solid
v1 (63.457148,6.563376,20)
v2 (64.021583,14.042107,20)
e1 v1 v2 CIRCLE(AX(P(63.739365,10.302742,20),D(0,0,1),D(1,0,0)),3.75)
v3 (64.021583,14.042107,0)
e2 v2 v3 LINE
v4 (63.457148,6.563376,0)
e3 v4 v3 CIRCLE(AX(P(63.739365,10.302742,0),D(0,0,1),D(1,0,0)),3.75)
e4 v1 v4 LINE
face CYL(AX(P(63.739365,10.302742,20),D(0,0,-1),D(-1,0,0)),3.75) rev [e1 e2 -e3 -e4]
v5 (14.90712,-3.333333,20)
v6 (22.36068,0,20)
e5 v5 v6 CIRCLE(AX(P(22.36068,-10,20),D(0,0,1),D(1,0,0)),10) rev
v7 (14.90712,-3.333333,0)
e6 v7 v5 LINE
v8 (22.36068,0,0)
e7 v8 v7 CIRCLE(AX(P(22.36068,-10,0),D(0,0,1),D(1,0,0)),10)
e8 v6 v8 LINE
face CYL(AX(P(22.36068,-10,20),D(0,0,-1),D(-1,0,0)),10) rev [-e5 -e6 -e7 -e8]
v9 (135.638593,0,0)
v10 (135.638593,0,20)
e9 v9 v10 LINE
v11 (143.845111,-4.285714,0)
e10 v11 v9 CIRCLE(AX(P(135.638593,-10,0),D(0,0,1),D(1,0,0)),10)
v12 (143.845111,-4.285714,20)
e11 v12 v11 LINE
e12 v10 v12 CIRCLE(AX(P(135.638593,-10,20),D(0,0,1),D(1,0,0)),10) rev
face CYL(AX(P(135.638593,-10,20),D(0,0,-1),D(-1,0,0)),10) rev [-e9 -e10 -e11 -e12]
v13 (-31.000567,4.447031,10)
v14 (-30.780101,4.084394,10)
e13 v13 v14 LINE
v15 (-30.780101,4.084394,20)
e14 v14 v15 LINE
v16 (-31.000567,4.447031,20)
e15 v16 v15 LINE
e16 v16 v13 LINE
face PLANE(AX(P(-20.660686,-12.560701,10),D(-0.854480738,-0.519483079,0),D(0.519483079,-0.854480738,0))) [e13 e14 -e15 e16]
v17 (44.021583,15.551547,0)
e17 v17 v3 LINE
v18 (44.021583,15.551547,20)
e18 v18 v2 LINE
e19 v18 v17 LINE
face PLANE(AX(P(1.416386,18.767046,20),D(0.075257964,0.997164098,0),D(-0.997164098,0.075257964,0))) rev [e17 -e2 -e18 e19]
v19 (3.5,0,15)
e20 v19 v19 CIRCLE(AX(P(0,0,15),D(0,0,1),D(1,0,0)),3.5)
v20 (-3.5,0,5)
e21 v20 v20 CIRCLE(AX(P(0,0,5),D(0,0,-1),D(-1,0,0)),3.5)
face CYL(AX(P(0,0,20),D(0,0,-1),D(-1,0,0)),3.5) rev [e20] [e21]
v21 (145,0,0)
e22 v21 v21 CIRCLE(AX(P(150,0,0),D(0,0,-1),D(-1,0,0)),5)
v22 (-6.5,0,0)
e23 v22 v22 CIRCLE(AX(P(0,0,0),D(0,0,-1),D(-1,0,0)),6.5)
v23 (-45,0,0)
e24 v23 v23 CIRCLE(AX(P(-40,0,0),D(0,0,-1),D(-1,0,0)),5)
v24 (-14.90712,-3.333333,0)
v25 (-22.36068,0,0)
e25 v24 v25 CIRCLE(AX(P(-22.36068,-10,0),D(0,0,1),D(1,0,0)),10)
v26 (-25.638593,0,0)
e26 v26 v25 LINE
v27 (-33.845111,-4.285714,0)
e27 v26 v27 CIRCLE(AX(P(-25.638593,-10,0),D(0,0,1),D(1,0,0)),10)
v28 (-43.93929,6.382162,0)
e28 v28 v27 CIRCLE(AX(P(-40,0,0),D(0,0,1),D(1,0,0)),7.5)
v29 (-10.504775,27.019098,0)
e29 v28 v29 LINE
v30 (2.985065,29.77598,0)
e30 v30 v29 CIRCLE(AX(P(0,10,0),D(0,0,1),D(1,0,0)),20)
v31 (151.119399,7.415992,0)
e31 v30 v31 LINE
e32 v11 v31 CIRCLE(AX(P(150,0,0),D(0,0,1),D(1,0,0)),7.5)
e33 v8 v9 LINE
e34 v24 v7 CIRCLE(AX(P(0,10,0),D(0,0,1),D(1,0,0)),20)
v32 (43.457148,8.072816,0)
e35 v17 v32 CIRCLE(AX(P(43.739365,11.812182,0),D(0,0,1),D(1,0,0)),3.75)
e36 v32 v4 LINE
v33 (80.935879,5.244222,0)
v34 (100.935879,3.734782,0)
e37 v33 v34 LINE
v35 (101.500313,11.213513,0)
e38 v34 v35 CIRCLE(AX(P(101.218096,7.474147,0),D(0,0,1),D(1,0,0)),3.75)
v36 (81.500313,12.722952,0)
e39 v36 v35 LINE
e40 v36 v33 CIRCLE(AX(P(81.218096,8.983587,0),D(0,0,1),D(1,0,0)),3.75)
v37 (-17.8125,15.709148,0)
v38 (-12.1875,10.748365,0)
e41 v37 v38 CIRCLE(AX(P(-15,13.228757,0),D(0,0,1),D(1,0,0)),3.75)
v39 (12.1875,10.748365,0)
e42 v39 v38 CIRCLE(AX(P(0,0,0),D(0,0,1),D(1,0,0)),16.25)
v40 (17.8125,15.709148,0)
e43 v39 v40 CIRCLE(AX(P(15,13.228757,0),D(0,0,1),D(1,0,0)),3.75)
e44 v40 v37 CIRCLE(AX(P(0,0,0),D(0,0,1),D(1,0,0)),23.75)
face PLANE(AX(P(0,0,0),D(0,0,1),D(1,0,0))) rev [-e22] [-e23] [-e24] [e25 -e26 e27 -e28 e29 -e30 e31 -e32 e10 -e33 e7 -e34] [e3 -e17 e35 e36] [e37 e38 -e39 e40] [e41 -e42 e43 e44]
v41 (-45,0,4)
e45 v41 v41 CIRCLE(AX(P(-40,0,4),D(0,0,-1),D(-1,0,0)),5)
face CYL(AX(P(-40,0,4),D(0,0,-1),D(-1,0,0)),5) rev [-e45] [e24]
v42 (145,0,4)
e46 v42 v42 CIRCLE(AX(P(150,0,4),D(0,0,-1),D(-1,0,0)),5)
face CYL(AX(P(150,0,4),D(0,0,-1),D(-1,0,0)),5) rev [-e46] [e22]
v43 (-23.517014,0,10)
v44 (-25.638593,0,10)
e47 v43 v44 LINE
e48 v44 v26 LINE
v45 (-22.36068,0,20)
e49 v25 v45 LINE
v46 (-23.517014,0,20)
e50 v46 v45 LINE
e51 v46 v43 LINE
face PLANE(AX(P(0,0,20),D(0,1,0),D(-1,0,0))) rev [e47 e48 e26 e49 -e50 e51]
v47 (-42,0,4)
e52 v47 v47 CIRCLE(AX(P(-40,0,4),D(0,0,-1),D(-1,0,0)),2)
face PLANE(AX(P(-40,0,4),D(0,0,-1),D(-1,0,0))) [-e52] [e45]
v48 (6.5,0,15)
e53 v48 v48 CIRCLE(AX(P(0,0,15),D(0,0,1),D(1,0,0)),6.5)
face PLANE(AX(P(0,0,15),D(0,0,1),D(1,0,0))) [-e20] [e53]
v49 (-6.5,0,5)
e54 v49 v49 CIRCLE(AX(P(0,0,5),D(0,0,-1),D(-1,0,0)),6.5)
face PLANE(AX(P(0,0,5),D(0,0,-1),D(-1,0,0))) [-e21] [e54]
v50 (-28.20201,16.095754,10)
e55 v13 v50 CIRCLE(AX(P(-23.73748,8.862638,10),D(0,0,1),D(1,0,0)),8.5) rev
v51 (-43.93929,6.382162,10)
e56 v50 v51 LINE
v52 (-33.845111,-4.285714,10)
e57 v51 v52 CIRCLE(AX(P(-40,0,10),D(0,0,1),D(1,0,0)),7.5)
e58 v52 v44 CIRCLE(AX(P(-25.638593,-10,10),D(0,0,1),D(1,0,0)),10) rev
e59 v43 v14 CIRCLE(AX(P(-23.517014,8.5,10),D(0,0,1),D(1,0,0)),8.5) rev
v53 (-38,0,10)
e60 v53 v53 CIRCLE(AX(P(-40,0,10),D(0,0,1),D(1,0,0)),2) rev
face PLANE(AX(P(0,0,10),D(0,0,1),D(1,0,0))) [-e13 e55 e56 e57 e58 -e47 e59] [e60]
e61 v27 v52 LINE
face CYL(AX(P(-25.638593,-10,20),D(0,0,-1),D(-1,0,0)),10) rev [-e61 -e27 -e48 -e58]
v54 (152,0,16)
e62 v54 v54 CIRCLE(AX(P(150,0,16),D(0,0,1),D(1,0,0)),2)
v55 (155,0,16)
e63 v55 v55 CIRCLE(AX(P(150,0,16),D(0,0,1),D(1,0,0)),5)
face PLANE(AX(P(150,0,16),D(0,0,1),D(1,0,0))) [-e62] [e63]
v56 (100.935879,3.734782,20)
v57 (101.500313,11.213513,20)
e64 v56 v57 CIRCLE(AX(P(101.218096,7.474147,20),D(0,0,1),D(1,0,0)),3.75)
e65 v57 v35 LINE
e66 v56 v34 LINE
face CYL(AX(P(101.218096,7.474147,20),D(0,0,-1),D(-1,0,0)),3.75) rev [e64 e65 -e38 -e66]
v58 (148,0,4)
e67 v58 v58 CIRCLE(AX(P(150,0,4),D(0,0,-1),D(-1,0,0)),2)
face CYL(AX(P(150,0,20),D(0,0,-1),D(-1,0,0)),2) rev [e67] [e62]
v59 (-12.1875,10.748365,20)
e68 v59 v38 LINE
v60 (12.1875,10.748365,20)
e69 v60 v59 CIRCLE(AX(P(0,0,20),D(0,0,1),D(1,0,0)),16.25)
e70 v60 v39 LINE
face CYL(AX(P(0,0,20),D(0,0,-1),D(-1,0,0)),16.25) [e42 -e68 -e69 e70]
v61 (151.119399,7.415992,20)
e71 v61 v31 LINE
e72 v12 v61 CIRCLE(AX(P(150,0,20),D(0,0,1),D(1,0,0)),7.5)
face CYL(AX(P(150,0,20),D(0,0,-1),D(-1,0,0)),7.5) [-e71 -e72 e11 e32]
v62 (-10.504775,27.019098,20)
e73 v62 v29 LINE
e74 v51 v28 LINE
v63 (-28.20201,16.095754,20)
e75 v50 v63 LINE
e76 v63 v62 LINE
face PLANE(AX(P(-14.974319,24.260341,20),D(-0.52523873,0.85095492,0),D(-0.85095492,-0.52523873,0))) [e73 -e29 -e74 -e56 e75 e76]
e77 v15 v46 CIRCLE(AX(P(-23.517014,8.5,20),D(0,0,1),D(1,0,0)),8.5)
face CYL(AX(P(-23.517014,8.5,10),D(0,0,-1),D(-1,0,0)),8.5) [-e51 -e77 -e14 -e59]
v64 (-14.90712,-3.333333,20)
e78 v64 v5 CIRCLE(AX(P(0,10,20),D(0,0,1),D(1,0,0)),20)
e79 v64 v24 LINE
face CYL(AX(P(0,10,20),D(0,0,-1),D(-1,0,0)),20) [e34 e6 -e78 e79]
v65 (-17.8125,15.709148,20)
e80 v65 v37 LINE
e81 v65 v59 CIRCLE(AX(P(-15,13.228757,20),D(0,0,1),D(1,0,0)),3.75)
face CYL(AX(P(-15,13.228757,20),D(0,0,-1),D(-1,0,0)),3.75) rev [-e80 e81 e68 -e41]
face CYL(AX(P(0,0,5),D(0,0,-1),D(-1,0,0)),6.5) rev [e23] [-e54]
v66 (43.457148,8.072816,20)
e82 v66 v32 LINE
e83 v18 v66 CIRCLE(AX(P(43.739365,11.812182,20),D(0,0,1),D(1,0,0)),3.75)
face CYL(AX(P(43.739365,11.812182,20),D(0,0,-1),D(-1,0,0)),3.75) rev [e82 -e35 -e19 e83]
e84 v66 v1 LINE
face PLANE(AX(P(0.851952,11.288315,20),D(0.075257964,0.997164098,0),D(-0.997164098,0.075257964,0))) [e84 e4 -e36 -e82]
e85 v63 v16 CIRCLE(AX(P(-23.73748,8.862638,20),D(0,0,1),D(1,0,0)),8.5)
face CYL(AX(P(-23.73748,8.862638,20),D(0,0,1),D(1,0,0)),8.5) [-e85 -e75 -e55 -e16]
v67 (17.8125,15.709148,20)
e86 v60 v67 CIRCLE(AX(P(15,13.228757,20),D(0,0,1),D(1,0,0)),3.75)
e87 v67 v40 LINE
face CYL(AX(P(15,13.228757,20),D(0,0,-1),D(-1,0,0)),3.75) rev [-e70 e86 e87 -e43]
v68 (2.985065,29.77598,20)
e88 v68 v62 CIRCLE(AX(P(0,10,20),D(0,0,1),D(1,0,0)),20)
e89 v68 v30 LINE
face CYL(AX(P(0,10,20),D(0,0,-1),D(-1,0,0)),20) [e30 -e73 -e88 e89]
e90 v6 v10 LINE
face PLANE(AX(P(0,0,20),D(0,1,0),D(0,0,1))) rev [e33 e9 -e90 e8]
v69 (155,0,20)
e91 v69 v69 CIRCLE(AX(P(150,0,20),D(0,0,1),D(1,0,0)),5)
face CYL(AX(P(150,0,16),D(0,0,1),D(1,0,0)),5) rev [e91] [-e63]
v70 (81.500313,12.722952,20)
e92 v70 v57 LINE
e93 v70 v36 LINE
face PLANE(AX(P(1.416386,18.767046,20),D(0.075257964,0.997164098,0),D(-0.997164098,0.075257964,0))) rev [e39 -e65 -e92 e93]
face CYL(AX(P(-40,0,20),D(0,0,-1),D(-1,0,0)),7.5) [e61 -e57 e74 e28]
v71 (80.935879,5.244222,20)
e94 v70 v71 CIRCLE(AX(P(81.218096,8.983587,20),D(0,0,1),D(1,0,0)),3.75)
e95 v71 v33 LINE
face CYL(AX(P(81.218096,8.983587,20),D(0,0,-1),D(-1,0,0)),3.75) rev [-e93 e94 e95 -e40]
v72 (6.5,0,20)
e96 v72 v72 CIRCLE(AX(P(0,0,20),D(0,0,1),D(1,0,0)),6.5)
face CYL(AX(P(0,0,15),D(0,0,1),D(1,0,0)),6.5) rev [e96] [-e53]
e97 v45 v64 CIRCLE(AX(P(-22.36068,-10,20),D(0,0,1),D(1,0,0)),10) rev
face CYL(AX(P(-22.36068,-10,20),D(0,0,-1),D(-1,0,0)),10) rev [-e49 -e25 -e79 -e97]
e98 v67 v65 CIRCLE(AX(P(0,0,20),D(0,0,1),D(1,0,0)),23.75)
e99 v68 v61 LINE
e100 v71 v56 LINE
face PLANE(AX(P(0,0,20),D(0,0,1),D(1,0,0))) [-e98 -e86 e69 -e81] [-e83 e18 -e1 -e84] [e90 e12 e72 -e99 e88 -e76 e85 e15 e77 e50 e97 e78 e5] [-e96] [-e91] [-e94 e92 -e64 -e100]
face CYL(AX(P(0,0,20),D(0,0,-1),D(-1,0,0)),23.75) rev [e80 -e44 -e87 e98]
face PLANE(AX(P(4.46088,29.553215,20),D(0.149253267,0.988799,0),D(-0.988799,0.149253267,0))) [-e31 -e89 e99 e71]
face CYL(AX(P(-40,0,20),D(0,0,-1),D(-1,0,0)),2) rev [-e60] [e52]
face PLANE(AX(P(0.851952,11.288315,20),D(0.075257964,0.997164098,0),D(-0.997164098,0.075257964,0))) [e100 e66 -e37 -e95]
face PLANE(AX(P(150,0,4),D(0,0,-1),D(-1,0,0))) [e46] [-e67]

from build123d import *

# Parameters (mm, degrees)
SKETCH1_R           = 3.5
SKETCH1_R_2         = 2
BOSS_EXTRUDE1_DEPTH = 20
FILLET1_R           = 10
SKETCH2_R           = 2
CUT_EXTRUDE4_DEPTH  = 10
FILLET3_R           = 8.5
SKETCH3_R           = 6.5
CUT_EXTRUDE5_DEPTH  = 5
CUT_EXTRUDE7_START  = -5
SKETCH5_R           = 6.5
CUT_EXTRUDE7_DEPTH  = 5
SKETCH7_R           = 5
CUT_EXTRUDE8_DEPTH  = 4
CUT_EXTRUDE9_START  = -4
SKETCH8_R           = 5
CUT_EXTRUDE9_DEPTH  = 4


with BuildPart() as part:
    # Sketch1 → Boss-Extrude1 (new body)
    with BuildSketch(Plane.XY):
        with BuildLine():
            Line((-10.504774602, 27.019098406), (-43.939290476, 6.382161902))
            ThreePointArc((-43.939290476, 6.382161902), (-43.654129269, -6.54960604), (-32.5, 0))
            Line((-32.5, 0), (-17.320508076, 0))
            ThreePointArc((-17.320508076, 0), (0, -10), (17.320508076, 0))
            Line((17.320508076, 0), (142.5, 0))
            ThreePointArc((142.5, 0), (154.891549026, -5.685309853), (151.1193995, 7.4159925))
            Line((151.1193995, 7.4159925), (2.985065333, 29.77598))
            ThreePointArc((2.985065333, 29.77598), (-4.004573123, 29.594983902), (-10.504774602, 27.019098406))
        make_face()
        with BuildLine():
            ThreePointArc((12.1875, 10.748364701), (0, 16.25), (-12.1875, 10.748364701))
            ThreePointArc((-12.1875, 10.748364701), (-17.480391854, 10.416256555), (-17.8125, 15.709148409))
            ThreePointArc((-17.8125, 15.709148409), (0, 23.75), (17.8125, 15.709148409))
            ThreePointArc((17.8125, 15.709148409), (17.480391854, 10.416256555), (12.1875, 10.748364701))
        make_face(mode=Mode.SUBTRACT)
        with BuildLine():
            Line((44.021582733, 15.551547034), (64.021582733, 14.042107131))
            ThreePointArc((64.021582733, 14.042107131), (67.478730737, 10.020524397), (63.457148004, 6.563376394))
            Line((63.457148004, 6.563376394), (43.457148004, 8.072816297))
            ThreePointArc((43.457148004, 8.072816297), (40, 12.09439903), (44.021582733, 15.551547034))
        make_face(mode=Mode.SUBTRACT)
        with BuildLine():
            ThreePointArc((80.93587874, 5.244221712), (77.478730737, 9.265804446), (81.50031347, 12.722952449))
            Line((81.50031347, 12.722952449), (101.50031347, 11.213512546))
            ThreePointArc((101.50031347, 11.213512546), (104.957461474, 7.191929813), (100.93587874, 3.734781809))
            Line((100.93587874, 3.734781809), (80.93587874, 5.244221712))
        make_face(mode=Mode.SUBTRACT)
        Circle(SKETCH1_R, mode=Mode.SUBTRACT)
        with Locations((-40, 0)):
            Circle(SKETCH1_R_2, mode=Mode.SUBTRACT)
        with Locations((150, 0)):
            Circle(SKETCH1_R_2, mode=Mode.SUBTRACT)
    extrude(amount=BOSS_EXTRUDE1_DEPTH)

    # Fillet1
    fillet1_edges = [part.edges().sort_by_distance(p)[0] for p in [
        (-32.5, 0, 10),
        (142.5, 0, 10),
        (17.320508076, 0, 10),
        (-17.320508076, 0, 10),
    ]]
    fillet(fillet1_edges, radius=FILLET1_R)

    # Sketch2 → Cut-Extrude4 (cut)
    # profile 1 of 3: a face of its own
    with BuildSketch(Plane.XY.offset(20)):
        with BuildLine():
            ThreePointArc((-30, 0), (-30.37066789, 2.697399324), (-31.455192622, 5.194830784))
            ThreePointArc((-31.455192622, 5.194830784), (-34.377165478, 8.269445685), (-38.310752735, 9.856289549))
            Line((-38.310752735, 9.856289549), (-43.939290476, 6.382161902))
            ThreePointArc((-43.939290476, 6.382161902), (-45.44776232, -5.154792498), (-33.84511145, -4.285714286))
            ThreePointArc((-33.84511145, -4.285714286), (-32.155948906, -2.415537132), (-30.052880016, -1.027036525))
            ThreePointArc((-30.052880016, -1.027036525), (-30.013228754, -0.514198483), (-30, 0))
        make_face()
        with Locations((-40, 0)):
            Circle(SKETCH2_R, mode=Mode.SUBTRACT)
    # profile 2 of 3: a face of its own
    with BuildSketch(Plane.XY.offset(20)):
        with BuildLine():
            Line((-31.455192622, 5.194830784), (-35.386468794, 11.661258469))
            Line((-35.386468794, 11.661258469), (-38.310752735, 9.856289549))
            ThreePointArc((-38.310752735, 9.856289549), (-34.377165478, 8.269445685), (-31.455192622, 5.194830784))
        make_face()
    # profile 3 of 3: a face of its own
    with BuildSketch(Plane.XY.offset(20)):
        with BuildLine():
            Line((-28.108612186, -0.309849995), (-31.455192622, 5.194830784))
            ThreePointArc((-31.455192622, 5.194830784), (-30.37066789, 2.697399324), (-30, 0))
            ThreePointArc((-30, 0), (-30.013228754, -0.514198483), (-30.052880016, -1.027036525))
            ThreePointArc((-30.052880016, -1.027036525), (-29.099374287, -0.617942894), (-28.108612186, -0.309849995))
        make_face()
    extrude(amount=-CUT_EXTRUDE4_DEPTH, mode=Mode.SUBTRACT)

    # Fillet3
    # the kernel refuses this fillet: 8.5 mm, written as the material it takes off along each edge
    with BuildSketch(Plane(origin=(-35.386468794, 11.661258469, 41.107049778), x_dir=(0.85095492032363, 0.5252387300809077, 0), z_dir=(0, 0, -1))) as fillet3_piece_1:
        with BuildLine():
            CenterArc((FILLET3_R * 0.993272930738, FILLET3_R), FILLET3_R, 180.386732, 89.613268)
            Line((-FILLET3_R * 0.00670428980784, FILLET3_R * 0.993250304523), (0, 0))
            Line((0, 0), (FILLET3_R * 0.993272930738, 0))
        make_face()
    extrude(amount=31.107049778, mode=Mode.SUBTRACT)
    with BuildSketch(Plane(origin=(-28.108612186, -0.309849995, 32.856474207), x_dir=(0.9977308400995106, 0.06732882528549343, 0), z_dir=(0, 0, -1))) as fillet3_piece_2:
        with BuildLine():
            CenterArc((5.174335728, -8.480712141), FILLET3_R, 93.86057806, 58.702416165)
            Line((-2.369567013, -4.564140753), (-3.123957287, -4.172483615))
            Line((-3.123957287, -4.172483615), (-0.754390274, 0.391657139))
            Line((-0.754390274, 0.391657139), (0.154018939, 0.835929522))
            ThreePointArc((0.154018939, 0.835929522), (2.428046269, 0.705227783), (4.544811212, 0.848071214))
            Line((4.544811212, 0.848071214), (4.602040713, 0))
        make_face()
    extrude(amount=22.856474207, mode=Mode.SUBTRACT)

    # Sketch3 → Cut-Extrude5 (cut)
    with BuildSketch(Plane.XY.offset(20)):
        Circle(SKETCH3_R)
    extrude(amount=-CUT_EXTRUDE5_DEPTH, mode=Mode.SUBTRACT)

    # Sketch5 → Cut-Extrude7 (cut)
    with BuildSketch(Plane(origin=(0, 0, 0), x_dir=(-1, 0, 0), z_dir=(0, 0, -1)).offset(CUT_EXTRUDE7_START)):
        with Locations(Location((0, 0, 0), (0, 0, 180))):
            Circle(SKETCH5_R)
    extrude(amount=CUT_EXTRUDE7_DEPTH, mode=Mode.SUBTRACT)

    # Sketch7 → Cut-Extrude8 (cut)
    with BuildSketch(Plane(origin=(0, 0, 0), x_dir=(-1, 0, 0), z_dir=(0, 0, -1))):
        with Locations((-150, 0)):
            Circle(SKETCH7_R)
        with Locations((40, 0)):
            Circle(SKETCH7_R)
    extrude(amount=-CUT_EXTRUDE8_DEPTH, mode=Mode.SUBTRACT)

    # Sketch8 → Cut-Extrude9 (cut)
    with BuildSketch(Plane.XY.offset(20).offset(CUT_EXTRUDE9_START)):
        with Locations(Location((150, 0, 0), (0, 0, 180))):
            Circle(SKETCH8_R)
    extrude(amount=CUT_EXTRUDE9_DEPTH, mode=Mode.SUBTRACT)


solid = part.part
